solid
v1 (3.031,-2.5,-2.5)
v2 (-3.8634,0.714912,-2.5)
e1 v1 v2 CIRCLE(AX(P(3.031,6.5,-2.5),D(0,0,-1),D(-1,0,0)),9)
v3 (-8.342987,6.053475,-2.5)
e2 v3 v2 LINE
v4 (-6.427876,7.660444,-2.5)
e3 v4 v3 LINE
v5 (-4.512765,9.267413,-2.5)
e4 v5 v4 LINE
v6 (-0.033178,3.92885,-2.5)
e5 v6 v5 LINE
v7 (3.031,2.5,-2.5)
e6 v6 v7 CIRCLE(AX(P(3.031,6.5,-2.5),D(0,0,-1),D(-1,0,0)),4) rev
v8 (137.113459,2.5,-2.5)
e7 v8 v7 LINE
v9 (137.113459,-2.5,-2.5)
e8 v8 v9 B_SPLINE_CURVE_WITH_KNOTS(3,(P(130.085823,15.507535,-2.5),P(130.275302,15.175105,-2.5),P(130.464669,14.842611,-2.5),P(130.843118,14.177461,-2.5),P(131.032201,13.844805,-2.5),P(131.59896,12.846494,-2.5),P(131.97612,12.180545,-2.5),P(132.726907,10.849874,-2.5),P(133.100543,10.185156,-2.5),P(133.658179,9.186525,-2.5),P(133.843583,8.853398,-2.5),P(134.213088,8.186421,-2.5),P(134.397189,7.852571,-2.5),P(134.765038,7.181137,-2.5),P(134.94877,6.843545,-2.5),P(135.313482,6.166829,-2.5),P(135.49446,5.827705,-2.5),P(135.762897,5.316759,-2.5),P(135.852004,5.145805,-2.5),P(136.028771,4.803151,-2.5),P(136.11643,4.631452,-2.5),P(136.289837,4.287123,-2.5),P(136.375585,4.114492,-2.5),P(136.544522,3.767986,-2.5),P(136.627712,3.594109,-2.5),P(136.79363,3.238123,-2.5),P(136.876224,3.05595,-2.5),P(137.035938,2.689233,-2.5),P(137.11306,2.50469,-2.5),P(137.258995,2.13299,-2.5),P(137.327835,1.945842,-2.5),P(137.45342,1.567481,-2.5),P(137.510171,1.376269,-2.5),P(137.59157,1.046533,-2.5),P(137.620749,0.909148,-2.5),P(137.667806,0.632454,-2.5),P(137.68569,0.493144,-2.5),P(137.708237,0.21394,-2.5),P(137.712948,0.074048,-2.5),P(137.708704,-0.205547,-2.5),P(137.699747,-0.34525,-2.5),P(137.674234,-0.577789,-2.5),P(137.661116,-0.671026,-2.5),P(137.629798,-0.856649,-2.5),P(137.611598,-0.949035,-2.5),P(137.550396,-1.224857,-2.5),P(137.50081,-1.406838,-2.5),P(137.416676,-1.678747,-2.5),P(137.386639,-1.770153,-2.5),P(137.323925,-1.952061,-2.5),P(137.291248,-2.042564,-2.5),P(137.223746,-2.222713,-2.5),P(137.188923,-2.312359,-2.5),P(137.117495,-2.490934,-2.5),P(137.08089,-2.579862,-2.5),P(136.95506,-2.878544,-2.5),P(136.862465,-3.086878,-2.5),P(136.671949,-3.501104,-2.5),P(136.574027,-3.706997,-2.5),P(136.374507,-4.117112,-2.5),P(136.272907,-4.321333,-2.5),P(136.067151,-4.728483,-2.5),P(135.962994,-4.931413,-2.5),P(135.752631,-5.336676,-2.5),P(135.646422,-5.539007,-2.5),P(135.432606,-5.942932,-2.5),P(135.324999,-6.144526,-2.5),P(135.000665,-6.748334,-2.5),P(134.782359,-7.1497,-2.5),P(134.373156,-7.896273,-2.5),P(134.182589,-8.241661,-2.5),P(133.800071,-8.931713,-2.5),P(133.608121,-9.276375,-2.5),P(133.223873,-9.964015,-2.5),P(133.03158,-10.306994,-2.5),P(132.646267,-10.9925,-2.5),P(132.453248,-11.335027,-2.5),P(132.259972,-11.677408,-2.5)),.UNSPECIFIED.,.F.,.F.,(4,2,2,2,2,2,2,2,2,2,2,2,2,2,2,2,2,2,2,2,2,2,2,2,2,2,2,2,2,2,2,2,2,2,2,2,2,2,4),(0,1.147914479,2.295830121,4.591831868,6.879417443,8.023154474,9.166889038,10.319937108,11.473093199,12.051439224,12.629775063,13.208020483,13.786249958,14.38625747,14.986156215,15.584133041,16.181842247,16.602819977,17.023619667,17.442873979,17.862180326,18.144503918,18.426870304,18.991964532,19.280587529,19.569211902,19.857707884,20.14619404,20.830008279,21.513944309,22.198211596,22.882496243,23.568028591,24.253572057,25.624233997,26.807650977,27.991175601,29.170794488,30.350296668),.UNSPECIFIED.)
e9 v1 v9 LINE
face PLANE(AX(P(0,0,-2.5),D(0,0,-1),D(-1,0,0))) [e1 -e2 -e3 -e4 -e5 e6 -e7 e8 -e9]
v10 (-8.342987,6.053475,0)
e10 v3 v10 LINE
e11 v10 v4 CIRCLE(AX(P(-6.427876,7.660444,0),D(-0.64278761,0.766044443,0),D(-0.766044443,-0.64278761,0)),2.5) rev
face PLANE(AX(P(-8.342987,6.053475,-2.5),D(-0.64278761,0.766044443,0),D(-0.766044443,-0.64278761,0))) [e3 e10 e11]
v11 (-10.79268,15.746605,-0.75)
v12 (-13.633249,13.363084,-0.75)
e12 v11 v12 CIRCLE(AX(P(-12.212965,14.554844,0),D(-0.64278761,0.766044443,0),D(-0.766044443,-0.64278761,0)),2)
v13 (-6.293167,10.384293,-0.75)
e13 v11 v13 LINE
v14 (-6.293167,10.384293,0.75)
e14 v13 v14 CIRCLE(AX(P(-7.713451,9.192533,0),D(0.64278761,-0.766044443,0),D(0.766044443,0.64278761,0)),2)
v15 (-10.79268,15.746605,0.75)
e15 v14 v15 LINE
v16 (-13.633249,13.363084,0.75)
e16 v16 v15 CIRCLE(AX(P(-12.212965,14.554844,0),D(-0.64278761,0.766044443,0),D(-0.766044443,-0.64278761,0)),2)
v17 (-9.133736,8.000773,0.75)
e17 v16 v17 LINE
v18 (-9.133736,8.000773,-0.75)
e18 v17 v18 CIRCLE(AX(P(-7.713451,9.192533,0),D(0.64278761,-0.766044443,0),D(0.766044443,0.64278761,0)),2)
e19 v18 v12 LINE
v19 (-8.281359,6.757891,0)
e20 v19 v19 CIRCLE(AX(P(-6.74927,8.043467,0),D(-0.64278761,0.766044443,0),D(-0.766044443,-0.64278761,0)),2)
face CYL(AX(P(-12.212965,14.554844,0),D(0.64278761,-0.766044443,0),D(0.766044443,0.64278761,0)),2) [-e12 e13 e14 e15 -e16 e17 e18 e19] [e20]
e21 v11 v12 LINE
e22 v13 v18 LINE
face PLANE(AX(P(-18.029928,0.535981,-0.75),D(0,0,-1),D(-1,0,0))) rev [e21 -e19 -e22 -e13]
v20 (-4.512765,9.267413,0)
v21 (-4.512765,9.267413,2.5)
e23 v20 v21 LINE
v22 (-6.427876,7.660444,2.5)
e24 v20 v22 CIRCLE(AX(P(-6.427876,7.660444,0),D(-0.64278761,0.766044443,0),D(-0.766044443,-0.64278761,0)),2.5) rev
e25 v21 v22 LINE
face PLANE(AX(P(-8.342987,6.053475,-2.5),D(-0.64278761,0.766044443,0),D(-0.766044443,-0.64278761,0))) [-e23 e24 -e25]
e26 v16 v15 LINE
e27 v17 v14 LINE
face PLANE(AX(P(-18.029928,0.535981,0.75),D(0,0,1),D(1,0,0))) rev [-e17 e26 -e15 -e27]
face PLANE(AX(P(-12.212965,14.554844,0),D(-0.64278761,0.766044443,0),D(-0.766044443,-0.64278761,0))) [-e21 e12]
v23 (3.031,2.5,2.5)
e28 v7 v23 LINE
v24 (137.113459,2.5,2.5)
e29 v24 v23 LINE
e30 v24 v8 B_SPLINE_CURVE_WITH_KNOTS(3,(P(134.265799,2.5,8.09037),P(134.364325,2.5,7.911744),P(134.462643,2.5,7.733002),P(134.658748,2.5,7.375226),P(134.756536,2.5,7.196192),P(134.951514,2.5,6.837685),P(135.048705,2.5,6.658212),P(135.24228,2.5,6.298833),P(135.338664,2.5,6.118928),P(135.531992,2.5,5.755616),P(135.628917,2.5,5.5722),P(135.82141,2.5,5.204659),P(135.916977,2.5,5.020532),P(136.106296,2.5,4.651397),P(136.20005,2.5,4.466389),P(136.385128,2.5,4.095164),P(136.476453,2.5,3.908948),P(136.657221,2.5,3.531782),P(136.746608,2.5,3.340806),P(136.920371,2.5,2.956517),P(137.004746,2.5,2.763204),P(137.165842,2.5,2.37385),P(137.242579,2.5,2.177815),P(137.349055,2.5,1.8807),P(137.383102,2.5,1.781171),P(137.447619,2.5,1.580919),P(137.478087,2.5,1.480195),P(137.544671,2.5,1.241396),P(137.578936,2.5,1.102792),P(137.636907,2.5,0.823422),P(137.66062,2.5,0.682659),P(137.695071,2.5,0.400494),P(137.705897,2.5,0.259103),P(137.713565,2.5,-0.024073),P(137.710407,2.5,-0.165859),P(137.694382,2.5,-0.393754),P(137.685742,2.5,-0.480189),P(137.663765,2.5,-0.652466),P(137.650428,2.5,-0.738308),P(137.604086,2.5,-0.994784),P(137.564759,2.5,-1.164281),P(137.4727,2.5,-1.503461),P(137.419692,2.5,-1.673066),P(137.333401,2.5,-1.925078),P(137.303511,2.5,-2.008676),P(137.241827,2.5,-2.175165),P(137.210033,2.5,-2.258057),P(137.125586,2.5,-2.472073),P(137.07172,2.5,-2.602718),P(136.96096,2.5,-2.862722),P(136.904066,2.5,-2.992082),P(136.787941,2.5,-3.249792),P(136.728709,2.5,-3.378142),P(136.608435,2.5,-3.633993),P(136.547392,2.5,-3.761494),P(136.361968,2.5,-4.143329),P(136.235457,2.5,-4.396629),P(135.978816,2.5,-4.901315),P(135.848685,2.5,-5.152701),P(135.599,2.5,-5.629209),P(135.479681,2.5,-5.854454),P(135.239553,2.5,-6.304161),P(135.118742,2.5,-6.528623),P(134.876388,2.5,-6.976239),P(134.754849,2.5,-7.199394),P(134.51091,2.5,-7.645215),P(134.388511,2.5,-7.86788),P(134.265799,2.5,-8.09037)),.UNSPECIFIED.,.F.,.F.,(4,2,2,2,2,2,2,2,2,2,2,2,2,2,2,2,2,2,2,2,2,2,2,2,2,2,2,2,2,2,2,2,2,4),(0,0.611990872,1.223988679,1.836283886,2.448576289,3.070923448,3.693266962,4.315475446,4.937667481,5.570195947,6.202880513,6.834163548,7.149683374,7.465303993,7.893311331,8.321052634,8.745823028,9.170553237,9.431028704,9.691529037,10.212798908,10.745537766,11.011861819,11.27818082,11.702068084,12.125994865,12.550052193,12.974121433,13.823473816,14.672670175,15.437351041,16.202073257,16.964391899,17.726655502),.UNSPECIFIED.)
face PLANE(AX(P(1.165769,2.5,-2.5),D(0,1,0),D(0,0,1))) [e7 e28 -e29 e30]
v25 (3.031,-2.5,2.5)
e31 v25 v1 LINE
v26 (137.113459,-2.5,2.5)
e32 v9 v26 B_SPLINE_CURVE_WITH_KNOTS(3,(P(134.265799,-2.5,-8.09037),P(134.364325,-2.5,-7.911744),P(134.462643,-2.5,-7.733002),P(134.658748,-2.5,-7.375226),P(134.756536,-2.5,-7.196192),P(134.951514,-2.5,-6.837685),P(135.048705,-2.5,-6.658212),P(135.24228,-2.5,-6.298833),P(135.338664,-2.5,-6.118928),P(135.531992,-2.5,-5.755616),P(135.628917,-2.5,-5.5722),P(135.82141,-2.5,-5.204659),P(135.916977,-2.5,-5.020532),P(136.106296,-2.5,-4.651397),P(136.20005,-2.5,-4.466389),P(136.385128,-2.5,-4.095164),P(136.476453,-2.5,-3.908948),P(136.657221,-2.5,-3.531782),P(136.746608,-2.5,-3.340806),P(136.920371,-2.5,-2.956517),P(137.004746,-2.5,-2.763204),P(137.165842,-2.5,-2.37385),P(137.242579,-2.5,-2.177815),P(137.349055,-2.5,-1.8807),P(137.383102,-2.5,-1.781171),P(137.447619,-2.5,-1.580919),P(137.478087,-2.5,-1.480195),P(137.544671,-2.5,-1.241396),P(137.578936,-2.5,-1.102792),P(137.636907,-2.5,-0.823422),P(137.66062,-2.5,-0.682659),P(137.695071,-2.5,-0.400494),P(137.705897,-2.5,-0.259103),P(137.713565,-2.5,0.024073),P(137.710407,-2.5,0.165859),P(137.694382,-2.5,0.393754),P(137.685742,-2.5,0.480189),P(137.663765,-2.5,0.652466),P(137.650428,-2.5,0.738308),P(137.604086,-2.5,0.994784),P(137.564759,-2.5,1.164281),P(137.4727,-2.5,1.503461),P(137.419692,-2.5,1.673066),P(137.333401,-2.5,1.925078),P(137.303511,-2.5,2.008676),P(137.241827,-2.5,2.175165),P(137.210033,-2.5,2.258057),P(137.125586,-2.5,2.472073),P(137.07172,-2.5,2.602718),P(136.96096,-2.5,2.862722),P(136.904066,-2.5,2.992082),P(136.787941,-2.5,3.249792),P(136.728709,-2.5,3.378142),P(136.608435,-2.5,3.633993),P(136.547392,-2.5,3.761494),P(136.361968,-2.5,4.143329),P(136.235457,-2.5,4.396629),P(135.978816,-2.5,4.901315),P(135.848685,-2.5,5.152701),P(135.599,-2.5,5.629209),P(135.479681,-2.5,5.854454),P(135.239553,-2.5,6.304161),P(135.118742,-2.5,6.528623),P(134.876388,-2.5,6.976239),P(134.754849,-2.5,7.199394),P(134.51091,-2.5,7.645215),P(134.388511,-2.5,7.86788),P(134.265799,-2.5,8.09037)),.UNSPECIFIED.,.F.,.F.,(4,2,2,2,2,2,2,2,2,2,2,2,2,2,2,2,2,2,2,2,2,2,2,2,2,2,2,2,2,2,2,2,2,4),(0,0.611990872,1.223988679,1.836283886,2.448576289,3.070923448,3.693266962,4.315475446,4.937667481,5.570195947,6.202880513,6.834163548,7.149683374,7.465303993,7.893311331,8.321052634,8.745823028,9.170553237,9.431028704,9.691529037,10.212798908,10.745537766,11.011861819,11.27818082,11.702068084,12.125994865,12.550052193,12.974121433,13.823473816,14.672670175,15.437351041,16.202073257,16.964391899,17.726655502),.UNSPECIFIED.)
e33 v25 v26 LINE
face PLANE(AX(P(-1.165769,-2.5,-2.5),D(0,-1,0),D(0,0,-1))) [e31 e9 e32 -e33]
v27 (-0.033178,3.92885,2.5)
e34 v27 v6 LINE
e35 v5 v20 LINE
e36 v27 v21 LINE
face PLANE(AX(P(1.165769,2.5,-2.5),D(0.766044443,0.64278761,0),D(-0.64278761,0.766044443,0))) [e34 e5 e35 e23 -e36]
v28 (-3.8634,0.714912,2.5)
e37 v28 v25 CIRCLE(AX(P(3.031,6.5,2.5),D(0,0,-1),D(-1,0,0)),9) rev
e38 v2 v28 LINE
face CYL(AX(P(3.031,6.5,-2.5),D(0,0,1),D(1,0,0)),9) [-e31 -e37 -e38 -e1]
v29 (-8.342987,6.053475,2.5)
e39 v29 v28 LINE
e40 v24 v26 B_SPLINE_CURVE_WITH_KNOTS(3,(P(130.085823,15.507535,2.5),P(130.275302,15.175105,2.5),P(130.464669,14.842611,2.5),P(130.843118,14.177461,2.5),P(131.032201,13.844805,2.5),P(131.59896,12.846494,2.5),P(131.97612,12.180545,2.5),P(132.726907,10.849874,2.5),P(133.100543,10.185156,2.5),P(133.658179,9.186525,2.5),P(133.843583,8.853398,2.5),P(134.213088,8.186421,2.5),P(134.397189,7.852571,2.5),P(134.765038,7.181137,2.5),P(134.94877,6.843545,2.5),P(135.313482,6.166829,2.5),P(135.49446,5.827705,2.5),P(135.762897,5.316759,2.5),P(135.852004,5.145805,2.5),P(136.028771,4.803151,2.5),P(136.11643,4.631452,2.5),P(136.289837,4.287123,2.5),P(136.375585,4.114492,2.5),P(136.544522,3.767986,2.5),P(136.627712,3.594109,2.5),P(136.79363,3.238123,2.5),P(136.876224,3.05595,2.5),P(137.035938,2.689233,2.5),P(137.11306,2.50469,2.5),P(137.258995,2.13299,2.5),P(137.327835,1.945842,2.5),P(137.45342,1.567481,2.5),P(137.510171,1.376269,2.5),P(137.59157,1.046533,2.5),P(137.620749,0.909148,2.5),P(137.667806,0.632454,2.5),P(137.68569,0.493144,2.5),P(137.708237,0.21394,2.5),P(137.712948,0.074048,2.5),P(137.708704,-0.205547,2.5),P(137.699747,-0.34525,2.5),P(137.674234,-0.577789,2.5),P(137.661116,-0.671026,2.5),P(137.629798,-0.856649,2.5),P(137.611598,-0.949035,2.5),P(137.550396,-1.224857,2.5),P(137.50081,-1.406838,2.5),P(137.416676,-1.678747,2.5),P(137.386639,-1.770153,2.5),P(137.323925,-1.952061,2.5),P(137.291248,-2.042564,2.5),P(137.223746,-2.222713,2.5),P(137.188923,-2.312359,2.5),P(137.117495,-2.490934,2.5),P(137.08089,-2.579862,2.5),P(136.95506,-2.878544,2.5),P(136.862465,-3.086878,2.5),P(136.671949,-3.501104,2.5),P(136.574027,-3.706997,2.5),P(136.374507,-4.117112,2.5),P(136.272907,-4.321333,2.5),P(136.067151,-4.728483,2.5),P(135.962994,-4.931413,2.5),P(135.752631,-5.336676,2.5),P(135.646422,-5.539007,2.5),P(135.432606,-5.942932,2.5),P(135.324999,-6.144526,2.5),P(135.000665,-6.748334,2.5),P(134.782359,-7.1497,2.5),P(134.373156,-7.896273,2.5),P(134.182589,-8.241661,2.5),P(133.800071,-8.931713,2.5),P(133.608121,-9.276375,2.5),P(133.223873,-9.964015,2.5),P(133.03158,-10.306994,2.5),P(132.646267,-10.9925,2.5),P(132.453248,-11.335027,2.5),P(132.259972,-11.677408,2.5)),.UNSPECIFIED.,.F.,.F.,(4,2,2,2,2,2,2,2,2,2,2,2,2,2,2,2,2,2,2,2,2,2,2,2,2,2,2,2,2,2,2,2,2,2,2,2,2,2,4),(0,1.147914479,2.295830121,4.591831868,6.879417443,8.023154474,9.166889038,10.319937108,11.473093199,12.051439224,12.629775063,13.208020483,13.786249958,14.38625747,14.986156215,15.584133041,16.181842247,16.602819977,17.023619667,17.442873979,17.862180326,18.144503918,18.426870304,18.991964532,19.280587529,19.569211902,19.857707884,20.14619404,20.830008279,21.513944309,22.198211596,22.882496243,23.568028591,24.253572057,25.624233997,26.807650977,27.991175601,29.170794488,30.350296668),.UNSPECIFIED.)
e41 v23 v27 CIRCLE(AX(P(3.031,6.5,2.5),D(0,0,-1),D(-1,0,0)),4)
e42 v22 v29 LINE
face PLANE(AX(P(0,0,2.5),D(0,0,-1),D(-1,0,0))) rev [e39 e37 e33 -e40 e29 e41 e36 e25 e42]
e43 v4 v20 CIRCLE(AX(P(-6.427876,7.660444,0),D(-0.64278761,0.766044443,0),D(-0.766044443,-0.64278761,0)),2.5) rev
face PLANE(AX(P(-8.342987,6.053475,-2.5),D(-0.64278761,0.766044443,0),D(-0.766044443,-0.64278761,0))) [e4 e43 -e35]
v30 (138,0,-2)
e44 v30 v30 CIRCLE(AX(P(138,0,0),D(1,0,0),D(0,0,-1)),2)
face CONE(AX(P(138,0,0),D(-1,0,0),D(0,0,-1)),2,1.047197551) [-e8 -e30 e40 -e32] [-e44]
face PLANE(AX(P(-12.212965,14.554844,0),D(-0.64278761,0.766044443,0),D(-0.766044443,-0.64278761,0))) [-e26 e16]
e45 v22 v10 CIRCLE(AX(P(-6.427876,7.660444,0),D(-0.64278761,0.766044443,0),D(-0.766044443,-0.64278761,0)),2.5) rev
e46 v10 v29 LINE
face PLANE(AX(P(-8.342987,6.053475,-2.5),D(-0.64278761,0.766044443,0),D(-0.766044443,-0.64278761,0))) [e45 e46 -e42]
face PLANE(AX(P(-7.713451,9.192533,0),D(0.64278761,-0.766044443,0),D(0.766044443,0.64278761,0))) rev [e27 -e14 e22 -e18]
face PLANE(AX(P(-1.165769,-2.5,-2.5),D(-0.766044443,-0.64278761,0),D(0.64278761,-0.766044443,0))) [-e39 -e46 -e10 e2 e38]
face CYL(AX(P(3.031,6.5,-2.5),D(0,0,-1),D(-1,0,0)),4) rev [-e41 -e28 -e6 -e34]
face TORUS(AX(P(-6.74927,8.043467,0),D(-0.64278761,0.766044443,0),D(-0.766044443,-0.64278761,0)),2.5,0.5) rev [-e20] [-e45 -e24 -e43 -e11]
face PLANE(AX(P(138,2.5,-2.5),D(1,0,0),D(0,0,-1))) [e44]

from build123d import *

# Parameters (mm, degrees)
EXTRUDE_1_DEPTH      = 2.5
EXTRUDE_1_DEPTH_BACK = 2.5
SKETCH_2_OUTSIDE_W   = 45.04
SKETCH_2_OUTSIDE_H   = 51.807
SKETCH_2_OUTSIDE_R   = 2
CUT_EXTRUDE_1_DEPTH  = 2.5
CUT_EXTRUDE_1_DRAFT  = -60
FILLET_2_R           = 4
FILLET_3_R           = 9
SKETCH_3_R           = 2
EXTRUDE_2_DEPTH      = 9
SKETCH_4_W           = 26.934408862
SKETCH_4_H           = 1.5
CUT_EXTRUDE_2_DEPTH  = 7
FILLET_4_R           = 0.5


with BuildPart() as part:
    # 草图1 → 凸台-拉伸1 (new, two sides: drawn at the far end of the back side and taken through both)
    with BuildSketch(Plane.XY.offset(-EXTRUDE_1_DEPTH_BACK)):
        Polygon((-1.165769145, -2.5), (-8.342987205, 6.053475407), (-4.512764989, 9.267413455), (1.165769145, 2.5), (138, 2.5), (138, -2.5), align=None)
    extrude(amount=EXTRUDE_1_DEPTH + EXTRUDE_1_DEPTH_BACK)


with BuildPart() as cut_extrude_1_tool:
    # 草图2 outside → 切除-拉伸1 (with draft: the straight prism first)
    with BuildSketch(Plane(origin=(138, 0, 0), x_dir=(0, 0, -1), z_dir=(1, 0, 0))):
        with Locations((0, 3.3835)):
            Rectangle(SKETCH_2_OUTSIDE_W, SKETCH_2_OUTSIDE_H)
        Circle(SKETCH_2_OUTSIDE_R, mode=Mode.SUBTRACT)
    extrude(amount=-CUT_EXTRUDE_1_DEPTH)
    # 切除-拉伸1: the draft: its side faces are tilted about the plane it starts from
    cut_extrude_1_sides = [cut_extrude_1_tool.faces().sort_by_distance(p)[0] for p in [
        (136.75, -22.52, 0),
        (136.75, 3.3835, -22.52),
        (136.75, 29.287, 0),
        (136.75, 3.3835, 22.52),
        (136.75, 0, 2),
    ]]
    draft(cut_extrude_1_sides, Plane(origin=(138, 0, 0), x_dir=(0, 0, -1), z_dir=(1, 0, 0)), CUT_EXTRUDE_1_DRAFT)


with BuildPart() as part_1:
    add(part.part)

    # 切除-拉伸1: cut by cut_extrude_1_tool
    add(cut_extrude_1_tool.part, mode=Mode.SUBTRACT)

    # 圆角2
    fillet_2_edges = [part_1.edges().sort_by_distance(p)[0] for p in [
        (1.165769145, 2.5, 0),
    ]]
    fillet(fillet_2_edges, radius=FILLET_2_R)

    # 圆角3
    fillet_3_edges = [part_1.edges().sort_by_distance(p)[0] for p in [
        (-1.165769145, -2.5, 0),
    ]]
    fillet(fillet_3_edges, radius=FILLET_3_R)

    # 草图3 → 凸台-拉伸2 (add)
    with BuildSketch(Plane(origin=(-6.427876097, 7.660444431, 0), x_dir=(0.7660444431189749, 0.6427876096865432, 0), z_dir=(-0.6427876096865431, 0.7660444431189748, 0))):
        Circle(SKETCH_3_R)
    extrude(amount=EXTRUDE_2_DEPTH)

    # 草图4 → 切除-拉伸2 (cut)
    with BuildSketch(Plane(origin=(-12.212964584, 14.554844419, 0), x_dir=(0.7660444431189747, 0.6427876096865435, 0), z_dir=(-0.6427876096865434, 0.7660444431189746, 0))):
        Rectangle(SKETCH_4_W, SKETCH_4_H)
    extrude(amount=-CUT_EXTRUDE_2_DEPTH, mode=Mode.SUBTRACT)

    # 圆角4
    fillet_4_edges = [part_1.edges().sort_by_distance(p)[0] for p in [
        (-7.959964983, 6.374869212, 0),
    ]]
    fillet(fillet_4_edges, radius=FILLET_4_R - 0.0001)  # a hair under: the kernel refuses the full size


solid = part_1.part
